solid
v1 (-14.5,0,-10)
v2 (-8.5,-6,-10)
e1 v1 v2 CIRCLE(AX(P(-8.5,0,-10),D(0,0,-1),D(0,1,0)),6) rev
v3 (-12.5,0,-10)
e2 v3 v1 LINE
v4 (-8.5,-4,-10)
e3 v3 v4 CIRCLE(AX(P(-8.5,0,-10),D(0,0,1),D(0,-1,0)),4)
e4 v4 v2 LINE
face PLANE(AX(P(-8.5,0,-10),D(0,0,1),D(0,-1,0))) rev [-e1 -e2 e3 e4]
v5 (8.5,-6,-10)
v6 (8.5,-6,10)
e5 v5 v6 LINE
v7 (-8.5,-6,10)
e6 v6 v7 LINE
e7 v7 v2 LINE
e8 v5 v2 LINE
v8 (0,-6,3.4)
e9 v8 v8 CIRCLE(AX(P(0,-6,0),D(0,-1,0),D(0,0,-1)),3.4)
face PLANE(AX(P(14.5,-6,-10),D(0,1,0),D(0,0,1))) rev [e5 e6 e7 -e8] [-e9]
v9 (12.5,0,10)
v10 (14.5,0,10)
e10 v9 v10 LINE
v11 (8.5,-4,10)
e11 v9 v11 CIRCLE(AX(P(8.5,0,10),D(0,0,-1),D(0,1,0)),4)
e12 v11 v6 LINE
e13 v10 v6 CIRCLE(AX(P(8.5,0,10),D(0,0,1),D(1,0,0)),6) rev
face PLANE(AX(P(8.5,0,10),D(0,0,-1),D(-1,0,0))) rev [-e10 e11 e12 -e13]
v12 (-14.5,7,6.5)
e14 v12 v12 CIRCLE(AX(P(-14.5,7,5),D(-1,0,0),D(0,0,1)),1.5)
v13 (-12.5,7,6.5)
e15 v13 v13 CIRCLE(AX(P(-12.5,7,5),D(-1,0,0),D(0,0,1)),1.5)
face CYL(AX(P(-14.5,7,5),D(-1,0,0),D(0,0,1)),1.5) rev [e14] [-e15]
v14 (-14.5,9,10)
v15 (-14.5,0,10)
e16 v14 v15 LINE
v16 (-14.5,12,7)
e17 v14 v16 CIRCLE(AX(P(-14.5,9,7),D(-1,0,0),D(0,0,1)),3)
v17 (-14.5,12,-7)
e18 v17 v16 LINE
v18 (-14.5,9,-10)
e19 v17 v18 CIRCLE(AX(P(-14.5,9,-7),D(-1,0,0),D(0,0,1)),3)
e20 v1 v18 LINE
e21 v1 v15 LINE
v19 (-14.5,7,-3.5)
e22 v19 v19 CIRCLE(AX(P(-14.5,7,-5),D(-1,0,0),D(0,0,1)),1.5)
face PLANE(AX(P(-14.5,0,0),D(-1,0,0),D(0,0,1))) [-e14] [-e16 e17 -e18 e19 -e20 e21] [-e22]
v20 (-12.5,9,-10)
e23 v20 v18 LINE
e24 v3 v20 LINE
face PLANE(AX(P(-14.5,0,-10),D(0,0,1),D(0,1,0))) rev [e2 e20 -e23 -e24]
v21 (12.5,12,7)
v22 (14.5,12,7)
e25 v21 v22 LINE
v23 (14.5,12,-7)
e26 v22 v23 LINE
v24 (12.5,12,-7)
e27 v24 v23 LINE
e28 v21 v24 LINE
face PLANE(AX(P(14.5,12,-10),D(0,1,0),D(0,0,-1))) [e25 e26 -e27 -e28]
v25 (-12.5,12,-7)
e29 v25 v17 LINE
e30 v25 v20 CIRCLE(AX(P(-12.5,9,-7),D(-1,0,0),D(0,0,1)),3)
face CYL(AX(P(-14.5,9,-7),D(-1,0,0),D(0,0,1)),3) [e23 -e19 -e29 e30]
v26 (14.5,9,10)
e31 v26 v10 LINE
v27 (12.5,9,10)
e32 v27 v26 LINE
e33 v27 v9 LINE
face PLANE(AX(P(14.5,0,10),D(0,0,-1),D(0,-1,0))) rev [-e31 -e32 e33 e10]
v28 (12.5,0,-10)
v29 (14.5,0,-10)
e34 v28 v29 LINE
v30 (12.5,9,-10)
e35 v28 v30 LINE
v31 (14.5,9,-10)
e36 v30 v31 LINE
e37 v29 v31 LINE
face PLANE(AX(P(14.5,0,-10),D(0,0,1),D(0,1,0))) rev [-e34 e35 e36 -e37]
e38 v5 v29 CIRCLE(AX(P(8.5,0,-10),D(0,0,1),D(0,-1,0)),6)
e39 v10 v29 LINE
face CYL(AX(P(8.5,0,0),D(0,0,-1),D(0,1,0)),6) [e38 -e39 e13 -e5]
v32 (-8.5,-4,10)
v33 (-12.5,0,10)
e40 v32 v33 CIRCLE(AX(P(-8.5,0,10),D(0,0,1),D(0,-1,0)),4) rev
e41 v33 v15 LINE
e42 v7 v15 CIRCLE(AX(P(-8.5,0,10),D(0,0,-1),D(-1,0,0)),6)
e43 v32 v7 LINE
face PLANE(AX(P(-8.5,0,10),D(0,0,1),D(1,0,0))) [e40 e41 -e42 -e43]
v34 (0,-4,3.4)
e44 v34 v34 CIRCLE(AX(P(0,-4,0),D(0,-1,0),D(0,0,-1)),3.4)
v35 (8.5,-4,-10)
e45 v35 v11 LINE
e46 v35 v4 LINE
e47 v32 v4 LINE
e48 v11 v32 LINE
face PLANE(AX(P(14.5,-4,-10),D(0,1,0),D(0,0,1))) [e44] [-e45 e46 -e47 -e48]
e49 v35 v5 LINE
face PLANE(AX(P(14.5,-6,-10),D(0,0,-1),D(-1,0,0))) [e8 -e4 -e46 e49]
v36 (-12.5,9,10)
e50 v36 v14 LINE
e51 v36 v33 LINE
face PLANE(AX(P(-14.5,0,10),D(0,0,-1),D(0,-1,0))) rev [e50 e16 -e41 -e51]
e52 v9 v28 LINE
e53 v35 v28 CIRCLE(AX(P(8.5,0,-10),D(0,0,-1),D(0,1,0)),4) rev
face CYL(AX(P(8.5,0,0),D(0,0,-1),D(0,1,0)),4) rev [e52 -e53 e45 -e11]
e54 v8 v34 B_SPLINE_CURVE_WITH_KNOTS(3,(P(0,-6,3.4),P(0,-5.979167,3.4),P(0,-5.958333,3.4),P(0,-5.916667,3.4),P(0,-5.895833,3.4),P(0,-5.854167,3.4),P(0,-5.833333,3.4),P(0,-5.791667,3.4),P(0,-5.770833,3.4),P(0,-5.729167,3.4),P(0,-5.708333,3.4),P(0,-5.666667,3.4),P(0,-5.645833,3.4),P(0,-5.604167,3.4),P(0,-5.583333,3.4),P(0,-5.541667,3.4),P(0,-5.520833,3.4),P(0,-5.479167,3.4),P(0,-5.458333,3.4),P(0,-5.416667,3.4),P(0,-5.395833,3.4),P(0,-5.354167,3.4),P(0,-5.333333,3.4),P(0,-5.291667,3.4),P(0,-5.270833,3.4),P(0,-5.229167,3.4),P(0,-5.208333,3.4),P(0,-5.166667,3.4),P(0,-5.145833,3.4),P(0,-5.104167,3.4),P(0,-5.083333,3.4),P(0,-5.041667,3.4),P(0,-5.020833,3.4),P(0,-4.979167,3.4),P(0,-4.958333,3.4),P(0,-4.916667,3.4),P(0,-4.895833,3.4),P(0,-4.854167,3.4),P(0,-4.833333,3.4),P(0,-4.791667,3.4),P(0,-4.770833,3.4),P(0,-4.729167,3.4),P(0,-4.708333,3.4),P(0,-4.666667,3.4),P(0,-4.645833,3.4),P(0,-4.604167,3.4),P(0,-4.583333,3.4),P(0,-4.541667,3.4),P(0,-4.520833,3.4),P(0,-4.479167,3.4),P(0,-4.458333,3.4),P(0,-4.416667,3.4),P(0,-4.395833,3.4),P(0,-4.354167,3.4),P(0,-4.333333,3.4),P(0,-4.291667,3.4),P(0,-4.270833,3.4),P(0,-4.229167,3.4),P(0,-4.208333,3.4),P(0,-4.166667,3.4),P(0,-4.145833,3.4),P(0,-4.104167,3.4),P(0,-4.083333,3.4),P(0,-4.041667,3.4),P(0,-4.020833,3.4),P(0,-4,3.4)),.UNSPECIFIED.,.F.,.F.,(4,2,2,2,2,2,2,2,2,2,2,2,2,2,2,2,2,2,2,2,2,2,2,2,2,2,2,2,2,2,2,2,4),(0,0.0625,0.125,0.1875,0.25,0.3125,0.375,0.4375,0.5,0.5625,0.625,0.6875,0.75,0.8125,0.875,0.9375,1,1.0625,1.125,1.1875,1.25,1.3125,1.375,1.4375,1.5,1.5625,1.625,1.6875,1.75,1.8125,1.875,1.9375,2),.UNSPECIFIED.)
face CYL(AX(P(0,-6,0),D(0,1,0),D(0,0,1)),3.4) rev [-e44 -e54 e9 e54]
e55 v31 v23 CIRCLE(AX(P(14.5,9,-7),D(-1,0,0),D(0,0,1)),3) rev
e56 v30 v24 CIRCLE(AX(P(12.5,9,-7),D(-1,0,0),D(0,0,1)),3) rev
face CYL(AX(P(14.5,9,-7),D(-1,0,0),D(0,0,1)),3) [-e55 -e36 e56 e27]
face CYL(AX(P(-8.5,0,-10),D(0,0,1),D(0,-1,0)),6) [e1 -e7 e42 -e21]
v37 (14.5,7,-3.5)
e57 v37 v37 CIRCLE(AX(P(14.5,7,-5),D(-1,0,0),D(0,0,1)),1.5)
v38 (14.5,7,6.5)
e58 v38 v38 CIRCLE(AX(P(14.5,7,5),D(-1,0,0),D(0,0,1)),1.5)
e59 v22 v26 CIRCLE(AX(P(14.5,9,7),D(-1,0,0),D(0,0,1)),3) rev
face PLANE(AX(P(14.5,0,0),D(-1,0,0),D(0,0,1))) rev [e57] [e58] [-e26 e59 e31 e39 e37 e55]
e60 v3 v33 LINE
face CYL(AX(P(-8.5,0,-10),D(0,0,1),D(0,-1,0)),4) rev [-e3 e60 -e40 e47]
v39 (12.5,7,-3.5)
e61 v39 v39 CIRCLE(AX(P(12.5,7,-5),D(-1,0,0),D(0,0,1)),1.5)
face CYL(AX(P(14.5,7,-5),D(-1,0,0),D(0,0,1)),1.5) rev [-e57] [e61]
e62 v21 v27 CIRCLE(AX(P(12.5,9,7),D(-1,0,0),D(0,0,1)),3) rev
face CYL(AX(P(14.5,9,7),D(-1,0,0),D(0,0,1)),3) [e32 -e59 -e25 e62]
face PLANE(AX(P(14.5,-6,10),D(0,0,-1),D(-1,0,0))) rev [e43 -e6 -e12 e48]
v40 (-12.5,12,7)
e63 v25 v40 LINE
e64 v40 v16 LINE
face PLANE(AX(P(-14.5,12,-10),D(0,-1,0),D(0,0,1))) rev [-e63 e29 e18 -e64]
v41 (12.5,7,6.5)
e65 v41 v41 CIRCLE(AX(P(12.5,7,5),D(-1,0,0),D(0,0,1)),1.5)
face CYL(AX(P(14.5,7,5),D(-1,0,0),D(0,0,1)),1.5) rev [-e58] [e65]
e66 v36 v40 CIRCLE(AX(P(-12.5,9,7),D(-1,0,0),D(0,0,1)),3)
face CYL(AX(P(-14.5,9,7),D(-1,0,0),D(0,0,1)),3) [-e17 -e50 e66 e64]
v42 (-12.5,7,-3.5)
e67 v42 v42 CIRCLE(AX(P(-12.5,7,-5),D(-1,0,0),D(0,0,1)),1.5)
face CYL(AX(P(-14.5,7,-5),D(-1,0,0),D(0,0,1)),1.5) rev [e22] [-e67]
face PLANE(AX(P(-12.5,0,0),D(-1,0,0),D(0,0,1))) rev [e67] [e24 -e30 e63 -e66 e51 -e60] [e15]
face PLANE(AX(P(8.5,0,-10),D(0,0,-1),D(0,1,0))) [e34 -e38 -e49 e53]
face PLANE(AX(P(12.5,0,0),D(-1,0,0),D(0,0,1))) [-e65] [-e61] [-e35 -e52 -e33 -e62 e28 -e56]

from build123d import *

# Parameters (mm, degrees)
SKETCH1_W            = 20
SKETCH1_H            = 6
BOSS_EXTRUDE1_DEPTH  = 14.5
SKETCH2_W            = 3
SKETCH2_H            = 20
BOSS_EXTRUDE2_DEPTH  = 12
SKETCH7_R            = 1.5
CUT_EXTRUDE1_DEPTH   = 33.939338184
SKETCH8_R            = 3.4
CUT_EXTRUDE2_DEPTH   = 26.184320519
FILLET1_R            = 3
CONVERT_SOLID3_START = -10
CONVERT_SOLID3_DEPTH = 20


# Read off the part's stored shape, not the designer's step: Convert-Solid3
with BuildPart() as part:
    # Sketch1 → Boss-Extrude1 (new, symmetric)
    with BuildSketch(Plane(origin=(0, 0, 0), x_dir=(0, 0, -1), z_dir=(1, 0, 0))):
        with Locations((0, -3)):
            Rectangle(SKETCH1_W, SKETCH1_H)
    extrude(amount=BOSS_EXTRUDE1_DEPTH, both=True)

    # Sketch2 → Boss-Extrude2 (add)
    with BuildSketch(Plane(origin=(0, 0, 0), x_dir=(1, 0, 0), z_dir=(0, 1, 0))):
        with Locations((13, 0)):
            Rectangle(SKETCH2_W, SKETCH2_H)
        with Locations((-13, 0)):
            Rectangle(SKETCH2_W, SKETCH2_H)
    extrude(amount=BOSS_EXTRUDE2_DEPTH)

    # Sketch7 → Cut-Extrude1 (cut, through all)
    with BuildSketch(Plane.ZY.offset(14.5)):
        with Locations((-5, 7)):
            Circle(SKETCH7_R)
        with Locations((5, 7)):
            Circle(SKETCH7_R)
    extrude(amount=-CUT_EXTRUDE1_DEPTH, mode=Mode.SUBTRACT)

    # Sketch8 → Cut-Extrude2 (cut, through all)
    with BuildSketch(Plane.XZ.offset(6)):
        with Locations(Location((0, 0, 0), (0, 0, 270))):
            Circle(SKETCH8_R)
    extrude(amount=-CUT_EXTRUDE2_DEPTH, mode=Mode.SUBTRACT)

    # Fillet1
    fillet1_edges = [part.edges().sort_by_distance(p)[0] for p in [
        (-13, 12, 10),
        (-13, 12, -10),
        (13, 12, -10),
        (13, 12, 10),
    ]]
    fillet(fillet1_edges, radius=FILLET1_R)

    # Convert-Solid3 outline → Convert-Solid3 (cut)
    with BuildSketch(Plane.XY.offset(CONVERT_SOLID3_START)):
        with BuildLine():
            Line((14.5, -6), (14.5, 0))
            ThreePointArc((14.5, 0), (12.742640687, -4.242640687), (8.5, -6))
            Line((8.5, -6), (14.5, -6))
        make_face()
        with BuildLine():
            Line((-14.5, -6), (-8.5, -6))
            ThreePointArc((-8.5, -6), (-12.742640687, -4.242640687), (-14.5, 0))
            Line((-14.5, 0), (-14.5, -6))
        make_face()
        with BuildLine():
            Line((12.5, 0), (12.5, 12))
            Line((12.5, 12), (11.5, 12))
            Line((11.5, 12), (11.5, 0))
            Line((11.5, 0), (-11.5, 0))
            Line((-11.5, 0), (-11.5, 12))
            Line((-11.5, 12), (-12.5, 12))
            Line((-12.5, 12), (-12.5, 0))
            ThreePointArc((-12.5, 0), (-11.328427125, -2.828427125), (-8.5, -4))
            Line((-8.5, -4), (8.5, -4))
            ThreePointArc((8.5, -4), (11.328427125, -2.828427125), (12.5, 0))
        make_face()
    extrude(amount=CONVERT_SOLID3_DEPTH, mode=Mode.SUBTRACT)


solid = part.part
